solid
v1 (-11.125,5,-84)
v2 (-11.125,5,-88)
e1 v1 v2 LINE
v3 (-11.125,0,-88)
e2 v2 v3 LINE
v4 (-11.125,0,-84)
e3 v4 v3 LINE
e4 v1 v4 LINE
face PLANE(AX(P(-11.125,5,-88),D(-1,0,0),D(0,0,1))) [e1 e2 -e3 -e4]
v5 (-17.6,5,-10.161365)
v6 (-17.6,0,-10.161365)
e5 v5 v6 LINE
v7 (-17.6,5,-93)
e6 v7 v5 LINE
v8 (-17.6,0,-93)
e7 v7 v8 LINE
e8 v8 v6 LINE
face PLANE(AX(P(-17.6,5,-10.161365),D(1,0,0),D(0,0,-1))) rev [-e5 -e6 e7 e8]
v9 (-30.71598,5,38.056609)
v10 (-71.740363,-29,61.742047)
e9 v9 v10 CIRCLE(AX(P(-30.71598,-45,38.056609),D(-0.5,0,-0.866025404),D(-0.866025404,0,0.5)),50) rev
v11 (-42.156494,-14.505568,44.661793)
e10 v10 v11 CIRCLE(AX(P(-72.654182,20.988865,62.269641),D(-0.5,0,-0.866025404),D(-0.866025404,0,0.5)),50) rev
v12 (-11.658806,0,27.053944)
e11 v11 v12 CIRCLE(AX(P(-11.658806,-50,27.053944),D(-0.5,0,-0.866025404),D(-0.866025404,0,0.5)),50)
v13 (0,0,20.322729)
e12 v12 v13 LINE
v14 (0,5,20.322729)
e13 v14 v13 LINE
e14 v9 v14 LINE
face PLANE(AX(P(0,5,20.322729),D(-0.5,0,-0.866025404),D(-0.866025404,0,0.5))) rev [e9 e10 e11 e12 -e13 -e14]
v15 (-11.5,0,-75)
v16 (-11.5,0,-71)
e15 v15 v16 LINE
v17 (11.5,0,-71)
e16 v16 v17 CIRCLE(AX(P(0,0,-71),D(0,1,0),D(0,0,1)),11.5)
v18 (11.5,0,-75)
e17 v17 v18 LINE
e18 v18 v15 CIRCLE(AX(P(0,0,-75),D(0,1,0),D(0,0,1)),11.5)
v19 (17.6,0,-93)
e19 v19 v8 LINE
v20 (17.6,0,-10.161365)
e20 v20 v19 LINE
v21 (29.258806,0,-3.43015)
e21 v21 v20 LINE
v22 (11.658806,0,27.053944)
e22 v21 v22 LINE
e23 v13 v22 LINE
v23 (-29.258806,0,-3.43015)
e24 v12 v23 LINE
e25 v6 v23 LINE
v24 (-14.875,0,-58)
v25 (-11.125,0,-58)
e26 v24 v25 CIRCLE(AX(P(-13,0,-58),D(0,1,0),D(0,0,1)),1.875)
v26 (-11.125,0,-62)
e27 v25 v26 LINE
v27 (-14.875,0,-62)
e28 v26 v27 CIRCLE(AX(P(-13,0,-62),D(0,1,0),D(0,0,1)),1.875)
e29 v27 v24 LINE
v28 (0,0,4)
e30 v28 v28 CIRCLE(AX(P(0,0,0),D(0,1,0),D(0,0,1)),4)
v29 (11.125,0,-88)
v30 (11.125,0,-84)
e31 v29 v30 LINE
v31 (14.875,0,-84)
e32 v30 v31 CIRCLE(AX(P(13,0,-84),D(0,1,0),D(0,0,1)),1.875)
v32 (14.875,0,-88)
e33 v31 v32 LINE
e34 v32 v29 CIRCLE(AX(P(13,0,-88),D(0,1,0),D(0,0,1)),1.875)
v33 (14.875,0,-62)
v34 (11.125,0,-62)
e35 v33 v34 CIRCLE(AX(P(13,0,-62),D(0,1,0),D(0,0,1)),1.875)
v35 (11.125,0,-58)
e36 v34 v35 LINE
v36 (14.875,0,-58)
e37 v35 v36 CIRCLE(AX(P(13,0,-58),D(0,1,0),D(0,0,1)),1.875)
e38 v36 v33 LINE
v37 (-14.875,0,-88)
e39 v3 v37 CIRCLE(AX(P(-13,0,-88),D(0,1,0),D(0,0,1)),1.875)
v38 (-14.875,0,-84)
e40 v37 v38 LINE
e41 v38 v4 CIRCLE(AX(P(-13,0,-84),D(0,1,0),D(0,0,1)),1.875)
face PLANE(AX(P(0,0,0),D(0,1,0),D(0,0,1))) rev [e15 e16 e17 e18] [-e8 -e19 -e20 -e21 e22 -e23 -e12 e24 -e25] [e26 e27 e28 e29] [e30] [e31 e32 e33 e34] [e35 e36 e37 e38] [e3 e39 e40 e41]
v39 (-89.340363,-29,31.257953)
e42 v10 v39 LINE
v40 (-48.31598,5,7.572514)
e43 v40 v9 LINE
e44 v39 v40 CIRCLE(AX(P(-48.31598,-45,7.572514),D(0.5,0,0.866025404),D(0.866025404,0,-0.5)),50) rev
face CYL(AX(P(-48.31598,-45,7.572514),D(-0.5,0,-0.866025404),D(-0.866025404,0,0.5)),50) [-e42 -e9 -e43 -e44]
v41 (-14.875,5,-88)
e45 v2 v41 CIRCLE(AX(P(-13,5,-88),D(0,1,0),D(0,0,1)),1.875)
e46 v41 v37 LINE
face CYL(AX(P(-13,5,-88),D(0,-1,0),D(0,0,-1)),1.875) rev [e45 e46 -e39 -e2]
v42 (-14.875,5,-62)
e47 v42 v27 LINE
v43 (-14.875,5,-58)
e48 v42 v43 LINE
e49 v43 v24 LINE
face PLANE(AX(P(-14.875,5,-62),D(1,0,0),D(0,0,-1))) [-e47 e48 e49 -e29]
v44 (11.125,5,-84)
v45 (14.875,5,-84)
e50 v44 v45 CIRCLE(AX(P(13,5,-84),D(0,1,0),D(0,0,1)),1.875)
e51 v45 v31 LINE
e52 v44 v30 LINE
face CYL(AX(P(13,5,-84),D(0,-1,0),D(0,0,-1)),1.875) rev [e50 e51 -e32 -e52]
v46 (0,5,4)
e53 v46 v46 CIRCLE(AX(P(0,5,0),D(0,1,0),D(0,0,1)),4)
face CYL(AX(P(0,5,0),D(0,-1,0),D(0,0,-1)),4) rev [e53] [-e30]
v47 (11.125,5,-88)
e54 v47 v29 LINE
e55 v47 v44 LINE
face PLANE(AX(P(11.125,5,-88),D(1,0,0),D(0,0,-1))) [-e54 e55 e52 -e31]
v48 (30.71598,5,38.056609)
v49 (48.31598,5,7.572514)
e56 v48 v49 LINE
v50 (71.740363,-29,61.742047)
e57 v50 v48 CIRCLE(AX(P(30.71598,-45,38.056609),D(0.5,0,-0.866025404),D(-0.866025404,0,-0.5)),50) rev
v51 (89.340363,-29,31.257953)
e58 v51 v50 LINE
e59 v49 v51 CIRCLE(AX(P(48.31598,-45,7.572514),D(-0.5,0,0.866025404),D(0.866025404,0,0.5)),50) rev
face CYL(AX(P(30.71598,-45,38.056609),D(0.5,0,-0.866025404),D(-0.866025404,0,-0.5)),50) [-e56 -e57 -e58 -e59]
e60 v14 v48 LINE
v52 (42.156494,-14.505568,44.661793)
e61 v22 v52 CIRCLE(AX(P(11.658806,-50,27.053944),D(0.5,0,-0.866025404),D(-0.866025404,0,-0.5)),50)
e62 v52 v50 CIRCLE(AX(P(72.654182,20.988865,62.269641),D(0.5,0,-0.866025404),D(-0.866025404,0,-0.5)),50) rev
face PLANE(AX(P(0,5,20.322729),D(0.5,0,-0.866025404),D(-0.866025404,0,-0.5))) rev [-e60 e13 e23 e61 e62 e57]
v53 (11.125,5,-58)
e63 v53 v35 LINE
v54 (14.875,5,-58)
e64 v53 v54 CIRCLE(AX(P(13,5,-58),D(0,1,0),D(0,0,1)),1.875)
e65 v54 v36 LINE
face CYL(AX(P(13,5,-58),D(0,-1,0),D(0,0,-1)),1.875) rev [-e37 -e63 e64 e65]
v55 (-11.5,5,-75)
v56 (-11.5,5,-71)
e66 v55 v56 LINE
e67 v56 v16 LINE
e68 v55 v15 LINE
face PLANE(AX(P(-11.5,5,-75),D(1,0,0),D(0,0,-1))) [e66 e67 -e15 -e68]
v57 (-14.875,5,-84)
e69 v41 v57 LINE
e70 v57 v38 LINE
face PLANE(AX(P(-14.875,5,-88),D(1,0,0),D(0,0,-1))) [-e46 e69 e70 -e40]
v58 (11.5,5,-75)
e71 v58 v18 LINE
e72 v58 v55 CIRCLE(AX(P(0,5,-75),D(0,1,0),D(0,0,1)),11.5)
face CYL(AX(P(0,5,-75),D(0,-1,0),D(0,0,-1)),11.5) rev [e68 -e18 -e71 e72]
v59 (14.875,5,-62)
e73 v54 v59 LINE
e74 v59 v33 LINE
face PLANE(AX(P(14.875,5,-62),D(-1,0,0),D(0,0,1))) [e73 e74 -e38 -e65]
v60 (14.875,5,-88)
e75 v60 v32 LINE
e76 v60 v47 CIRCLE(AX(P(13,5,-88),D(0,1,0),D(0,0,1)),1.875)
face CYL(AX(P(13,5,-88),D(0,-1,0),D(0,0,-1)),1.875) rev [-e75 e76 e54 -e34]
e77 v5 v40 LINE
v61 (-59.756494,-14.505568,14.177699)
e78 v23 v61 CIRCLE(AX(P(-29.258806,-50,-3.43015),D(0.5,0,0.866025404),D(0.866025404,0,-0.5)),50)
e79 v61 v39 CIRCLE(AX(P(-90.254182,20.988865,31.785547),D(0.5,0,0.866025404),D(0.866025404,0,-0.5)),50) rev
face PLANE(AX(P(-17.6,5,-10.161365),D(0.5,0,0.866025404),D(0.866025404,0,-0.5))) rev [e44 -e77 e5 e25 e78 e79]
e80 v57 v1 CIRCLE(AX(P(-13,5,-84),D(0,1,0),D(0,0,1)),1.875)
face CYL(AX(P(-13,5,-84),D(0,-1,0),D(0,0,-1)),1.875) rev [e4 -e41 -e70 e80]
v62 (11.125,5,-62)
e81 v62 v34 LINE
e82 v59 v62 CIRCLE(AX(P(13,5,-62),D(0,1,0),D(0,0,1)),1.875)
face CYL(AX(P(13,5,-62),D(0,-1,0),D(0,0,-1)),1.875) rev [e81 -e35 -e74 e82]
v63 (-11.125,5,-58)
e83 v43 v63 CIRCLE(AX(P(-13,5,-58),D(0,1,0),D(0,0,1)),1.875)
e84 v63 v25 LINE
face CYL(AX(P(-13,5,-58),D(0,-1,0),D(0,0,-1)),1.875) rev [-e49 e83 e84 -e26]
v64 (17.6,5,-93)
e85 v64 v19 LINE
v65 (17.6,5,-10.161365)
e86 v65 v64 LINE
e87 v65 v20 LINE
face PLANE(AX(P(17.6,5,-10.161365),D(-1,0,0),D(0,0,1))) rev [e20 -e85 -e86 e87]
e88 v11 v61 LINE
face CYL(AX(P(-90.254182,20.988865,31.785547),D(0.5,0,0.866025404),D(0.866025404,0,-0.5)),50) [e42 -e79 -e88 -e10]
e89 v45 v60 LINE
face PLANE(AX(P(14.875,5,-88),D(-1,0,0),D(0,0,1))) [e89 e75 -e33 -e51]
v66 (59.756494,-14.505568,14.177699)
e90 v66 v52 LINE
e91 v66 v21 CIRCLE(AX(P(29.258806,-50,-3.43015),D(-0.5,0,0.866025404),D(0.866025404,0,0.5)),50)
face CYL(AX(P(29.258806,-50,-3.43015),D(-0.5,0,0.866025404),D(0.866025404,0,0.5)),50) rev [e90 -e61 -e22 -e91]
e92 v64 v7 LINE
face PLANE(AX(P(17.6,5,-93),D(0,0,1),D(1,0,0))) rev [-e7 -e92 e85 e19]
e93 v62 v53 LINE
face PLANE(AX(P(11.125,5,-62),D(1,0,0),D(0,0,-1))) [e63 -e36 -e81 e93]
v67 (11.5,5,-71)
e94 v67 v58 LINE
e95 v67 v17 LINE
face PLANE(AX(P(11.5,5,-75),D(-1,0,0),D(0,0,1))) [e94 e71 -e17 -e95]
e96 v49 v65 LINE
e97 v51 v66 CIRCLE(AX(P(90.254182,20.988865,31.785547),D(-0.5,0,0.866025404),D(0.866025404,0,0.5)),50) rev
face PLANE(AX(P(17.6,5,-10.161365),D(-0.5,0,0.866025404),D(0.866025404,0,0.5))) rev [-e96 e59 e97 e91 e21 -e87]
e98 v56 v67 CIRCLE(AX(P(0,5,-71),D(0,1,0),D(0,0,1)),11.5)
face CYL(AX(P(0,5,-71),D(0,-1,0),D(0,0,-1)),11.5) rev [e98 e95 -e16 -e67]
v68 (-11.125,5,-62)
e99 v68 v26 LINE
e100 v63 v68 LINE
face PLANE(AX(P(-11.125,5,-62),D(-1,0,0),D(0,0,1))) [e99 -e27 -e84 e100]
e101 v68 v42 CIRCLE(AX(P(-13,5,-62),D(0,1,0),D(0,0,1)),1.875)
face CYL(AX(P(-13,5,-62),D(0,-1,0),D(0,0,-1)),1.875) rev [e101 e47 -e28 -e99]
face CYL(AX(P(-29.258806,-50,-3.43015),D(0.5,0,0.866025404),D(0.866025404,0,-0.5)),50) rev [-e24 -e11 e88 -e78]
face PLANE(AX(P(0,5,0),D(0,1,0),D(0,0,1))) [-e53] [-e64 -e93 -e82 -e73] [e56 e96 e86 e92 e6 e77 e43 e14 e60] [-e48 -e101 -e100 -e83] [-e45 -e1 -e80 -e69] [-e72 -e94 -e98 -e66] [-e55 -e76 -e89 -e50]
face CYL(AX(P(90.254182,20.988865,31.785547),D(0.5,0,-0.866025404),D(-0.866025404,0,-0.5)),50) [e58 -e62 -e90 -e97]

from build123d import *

# Parameters (mm, degrees)
SKETCH1_R           = 4
BOSS_EXTRUDE1_DEPTH = 5
BOSS_EXTRUDE2_DEPTH = 29
FILLET1_R           = 50
FILLET2_R           = 50


with BuildPart() as part:
    # Sketch1 → Boss-Extrude1 (new body)
    with BuildSketch(Plane(origin=(0, 0, 0), x_dir=(1, 0, 0), z_dir=(0, 1, 0))):
        Polygon((-17.6, 10.161364738), (-17.6, 93), (17.6, 93), (17.6, 10.161364738), (89.340362552, -31.257952893), (71.740362552, -61.742047107), (0, -20.322729475), (-71.740362552, -61.742047107), (-89.340362552, -31.257952893), align=None)
        with Locations(Location((0, 0, 0), (0, 0, 270))):
            Circle(SKETCH1_R, mode=Mode.SUBTRACT)
        with BuildLine():
            Line((-11.5, 75), (-11.5, 71))
            ThreePointArc((-11.5, 71), (0, 59.5), (11.5, 71))
            Line((11.5, 71), (11.5, 75))
            ThreePointArc((11.5, 75), (0, 86.5), (-11.5, 75))
        make_face(mode=Mode.SUBTRACT)
        with BuildLine():
            Line((-14.875, 88), (-14.875, 84))
            ThreePointArc((-14.875, 84), (-13, 82.125), (-11.125, 84))
            Line((-11.125, 84), (-11.125, 88))
            ThreePointArc((-11.125, 88), (-13, 89.875), (-14.875, 88))
        make_face(mode=Mode.SUBTRACT)
        with BuildLine():
            Line((11.125, 88), (11.125, 84))
            ThreePointArc((11.125, 84), (13, 82.125), (14.875, 84))
            Line((14.875, 84), (14.875, 88))
            ThreePointArc((14.875, 88), (13, 89.875), (11.125, 88))
        make_face(mode=Mode.SUBTRACT)
        with BuildLine():
            Line((11.125, 62), (11.125, 58))
            ThreePointArc((11.125, 58), (13, 56.125), (14.875, 58))
            Line((14.875, 58), (14.875, 62))
            ThreePointArc((14.875, 62), (13, 63.875), (11.125, 62))
        make_face(mode=Mode.SUBTRACT)
        with BuildLine():
            Line((-14.875, 62), (-14.875, 58))
            ThreePointArc((-14.875, 58), (-13, 56.125), (-11.125, 58))
            Line((-11.125, 58), (-11.125, 62))
            ThreePointArc((-11.125, 62), (-13, 63.875), (-14.875, 62))
        make_face(mode=Mode.SUBTRACT)
    extrude(amount=BOSS_EXTRUDE1_DEPTH)

    # Sketch2 → Boss-Extrude2 (add)
    with BuildSketch(Plane.XZ):
        Polygon((-71.740362552, 61.742047107), (-89.340362552, 31.257952893), (-68.555752861, 19.257952893), (-50.955752861, 49.742047107), align=None)
        Polygon((71.740362552, 61.742047107), (89.340362552, 31.257952893), (68.555752861, 19.257952893), (50.955752861, 49.742047107), align=None)
    extrude(amount=BOSS_EXTRUDE2_DEPTH)

    # Fillet1
    # the kernel refuses this fillet: 50 mm, written as the material it adds along each edge
    with BuildSketch(Plane(origin=(-68.555752861, 0, 19.257952893), x_dir=(0, -1, 0), z_dir=(0.4999999999999999, 0, 0.8660254037844387))) as fillet1_piece_1:
        with BuildLine():
            CenterArc((50, 45.376205218), FILLET1_R, 180, 65.16541251)
            Line((0, 45.376205218), (-1, 45.376205218))
            Line((-1, 45.376205218), (-1, 0))
            Line((-1, 0), (0, -1))
            ThreePointArc((0, -1), (14.5, -1), (28.58, -0.907524104))
            Line((28.58, -0.907524104), (29, 0))
        make_face()
    extrude(amount=35.2)
    with BuildSketch(Plane(origin=(68.555752861, 0, 19.257952893), x_dir=(0, -1, 0), z_dir=(-0.49999999999999983, 0, 0.8660254037844388))) as fillet1_piece_2:
        with BuildLine():
            CenterArc((50, -45.376205218), FILLET1_R, 114.83458749, 65.16541251)
            Line((0, -45.376205218), (-1, -45.376205218))
            Line((-1, -45.376205218), (-1, 0))
            Line((-1, 0), (0, 1))
            ThreePointArc((0, 1), (14.5, 1), (28.58, 0.907524104))
            Line((28.58, 0.907524104), (29, 0))
        make_face()
    extrude(amount=35.2)
    # the kernel refuses this fillet: 50 mm, written as the material it takes off along each edge
    with BuildSketch(Plane(origin=(148.553958964, 5, -71.30300459), x_dir=(-0.8660254037844363, 0, -0.5000000000000039), z_dir=(-0.5000000000000039, 0, 0.8660254037844364)), Plane(origin=(-12.52676614, 5, 164.30300459), x_dir=(0.8660254037844429, 0, -0.4999999999999925), z_dir=(-0.49999999999999256, 0, -0.866025403784443))) as fillet1_2_piece_1:
        with BuildLine():
            CenterArc((47.370877129, 50), FILLET1_R, 198.662924885, 71.337075115)
            Line((0, 34), (-0.947417543, 33.68))
            ThreePointArc((-0.947417543, 33.68), (-1, 17), (-1, 0))
            Line((-1, 0), (0, -1))
            Line((0, -1), (47.370877129, -1))
            Line((47.370877129, -1), (47.370877129, 0))
        make_face()
    extrude(amount=272.054385647, mode=Mode.SUBTRACT)

    # Fillet2
    # the kernel refuses this fillet: 50 mm, written as the material it takes off along each edge
    with BuildSketch(Plane(origin=(-98.555752861, -29, -32.703571334), x_dir=(0.49710588531055566, 0.8188493868753551, -0.2870042166997965), z_dir=(0.4999999999999999, 0, 0.8660254037844387))) as fillet2_piece_1:
        with BuildLine():
            CenterArc((26.55146204, 49.210454923), FILLET2_R, 216.239467537, 43.564898237)
            Line((-13.776202402, 19.652385285), (-14.58275569, 19.061223892))
            ThreePointArc((-14.58275569, 19.061223892), (-7.706950588, 9.252184209), (-0.818849387, -0.574008433))
            Line((-0.818849387, -0.574008433), (0.177009747, -0.984209098))
            ThreePointArc((0.177009747, -0.984209098), (8.850487347, -0.210454923), (17.523964946, -0.984209098))
            Line((17.523964946, -0.984209098), (17.700974693, 0))
        make_face()
    extrude(amount=155.2, mode=Mode.SUBTRACT)
    with BuildSketch(Plane(origin=(98.555752861, -29, -32.703571334), x_dir=(-0.4971058853105562, 0.8188493868753546, -0.2870042166997967), z_dir=(-0.49999999999999983, 0, 0.8660254037844388))) as fillet2_piece_2:
        with BuildLine():
            CenterArc((26.55146204, -49.210454923), FILLET2_R, 100.195634226, 43.564898237)
            Line((-13.776202402, -19.652385285), (-14.58275569, -19.061223892))
            ThreePointArc((-14.58275569, -19.061223892), (-7.706950588, -9.252184209), (-0.818849387, 0.574008433))
            Line((-0.818849387, 0.574008433), (0.177009747, 0.984209098))
            ThreePointArc((0.177009747, 0.984209098), (8.850487347, 0.210454923), (17.523964946, 0.984209098))
            Line((17.523964946, 0.984209098), (17.700974693, 0))
        make_face()
    extrude(amount=155.2, mode=Mode.SUBTRACT)


solid = part.part
